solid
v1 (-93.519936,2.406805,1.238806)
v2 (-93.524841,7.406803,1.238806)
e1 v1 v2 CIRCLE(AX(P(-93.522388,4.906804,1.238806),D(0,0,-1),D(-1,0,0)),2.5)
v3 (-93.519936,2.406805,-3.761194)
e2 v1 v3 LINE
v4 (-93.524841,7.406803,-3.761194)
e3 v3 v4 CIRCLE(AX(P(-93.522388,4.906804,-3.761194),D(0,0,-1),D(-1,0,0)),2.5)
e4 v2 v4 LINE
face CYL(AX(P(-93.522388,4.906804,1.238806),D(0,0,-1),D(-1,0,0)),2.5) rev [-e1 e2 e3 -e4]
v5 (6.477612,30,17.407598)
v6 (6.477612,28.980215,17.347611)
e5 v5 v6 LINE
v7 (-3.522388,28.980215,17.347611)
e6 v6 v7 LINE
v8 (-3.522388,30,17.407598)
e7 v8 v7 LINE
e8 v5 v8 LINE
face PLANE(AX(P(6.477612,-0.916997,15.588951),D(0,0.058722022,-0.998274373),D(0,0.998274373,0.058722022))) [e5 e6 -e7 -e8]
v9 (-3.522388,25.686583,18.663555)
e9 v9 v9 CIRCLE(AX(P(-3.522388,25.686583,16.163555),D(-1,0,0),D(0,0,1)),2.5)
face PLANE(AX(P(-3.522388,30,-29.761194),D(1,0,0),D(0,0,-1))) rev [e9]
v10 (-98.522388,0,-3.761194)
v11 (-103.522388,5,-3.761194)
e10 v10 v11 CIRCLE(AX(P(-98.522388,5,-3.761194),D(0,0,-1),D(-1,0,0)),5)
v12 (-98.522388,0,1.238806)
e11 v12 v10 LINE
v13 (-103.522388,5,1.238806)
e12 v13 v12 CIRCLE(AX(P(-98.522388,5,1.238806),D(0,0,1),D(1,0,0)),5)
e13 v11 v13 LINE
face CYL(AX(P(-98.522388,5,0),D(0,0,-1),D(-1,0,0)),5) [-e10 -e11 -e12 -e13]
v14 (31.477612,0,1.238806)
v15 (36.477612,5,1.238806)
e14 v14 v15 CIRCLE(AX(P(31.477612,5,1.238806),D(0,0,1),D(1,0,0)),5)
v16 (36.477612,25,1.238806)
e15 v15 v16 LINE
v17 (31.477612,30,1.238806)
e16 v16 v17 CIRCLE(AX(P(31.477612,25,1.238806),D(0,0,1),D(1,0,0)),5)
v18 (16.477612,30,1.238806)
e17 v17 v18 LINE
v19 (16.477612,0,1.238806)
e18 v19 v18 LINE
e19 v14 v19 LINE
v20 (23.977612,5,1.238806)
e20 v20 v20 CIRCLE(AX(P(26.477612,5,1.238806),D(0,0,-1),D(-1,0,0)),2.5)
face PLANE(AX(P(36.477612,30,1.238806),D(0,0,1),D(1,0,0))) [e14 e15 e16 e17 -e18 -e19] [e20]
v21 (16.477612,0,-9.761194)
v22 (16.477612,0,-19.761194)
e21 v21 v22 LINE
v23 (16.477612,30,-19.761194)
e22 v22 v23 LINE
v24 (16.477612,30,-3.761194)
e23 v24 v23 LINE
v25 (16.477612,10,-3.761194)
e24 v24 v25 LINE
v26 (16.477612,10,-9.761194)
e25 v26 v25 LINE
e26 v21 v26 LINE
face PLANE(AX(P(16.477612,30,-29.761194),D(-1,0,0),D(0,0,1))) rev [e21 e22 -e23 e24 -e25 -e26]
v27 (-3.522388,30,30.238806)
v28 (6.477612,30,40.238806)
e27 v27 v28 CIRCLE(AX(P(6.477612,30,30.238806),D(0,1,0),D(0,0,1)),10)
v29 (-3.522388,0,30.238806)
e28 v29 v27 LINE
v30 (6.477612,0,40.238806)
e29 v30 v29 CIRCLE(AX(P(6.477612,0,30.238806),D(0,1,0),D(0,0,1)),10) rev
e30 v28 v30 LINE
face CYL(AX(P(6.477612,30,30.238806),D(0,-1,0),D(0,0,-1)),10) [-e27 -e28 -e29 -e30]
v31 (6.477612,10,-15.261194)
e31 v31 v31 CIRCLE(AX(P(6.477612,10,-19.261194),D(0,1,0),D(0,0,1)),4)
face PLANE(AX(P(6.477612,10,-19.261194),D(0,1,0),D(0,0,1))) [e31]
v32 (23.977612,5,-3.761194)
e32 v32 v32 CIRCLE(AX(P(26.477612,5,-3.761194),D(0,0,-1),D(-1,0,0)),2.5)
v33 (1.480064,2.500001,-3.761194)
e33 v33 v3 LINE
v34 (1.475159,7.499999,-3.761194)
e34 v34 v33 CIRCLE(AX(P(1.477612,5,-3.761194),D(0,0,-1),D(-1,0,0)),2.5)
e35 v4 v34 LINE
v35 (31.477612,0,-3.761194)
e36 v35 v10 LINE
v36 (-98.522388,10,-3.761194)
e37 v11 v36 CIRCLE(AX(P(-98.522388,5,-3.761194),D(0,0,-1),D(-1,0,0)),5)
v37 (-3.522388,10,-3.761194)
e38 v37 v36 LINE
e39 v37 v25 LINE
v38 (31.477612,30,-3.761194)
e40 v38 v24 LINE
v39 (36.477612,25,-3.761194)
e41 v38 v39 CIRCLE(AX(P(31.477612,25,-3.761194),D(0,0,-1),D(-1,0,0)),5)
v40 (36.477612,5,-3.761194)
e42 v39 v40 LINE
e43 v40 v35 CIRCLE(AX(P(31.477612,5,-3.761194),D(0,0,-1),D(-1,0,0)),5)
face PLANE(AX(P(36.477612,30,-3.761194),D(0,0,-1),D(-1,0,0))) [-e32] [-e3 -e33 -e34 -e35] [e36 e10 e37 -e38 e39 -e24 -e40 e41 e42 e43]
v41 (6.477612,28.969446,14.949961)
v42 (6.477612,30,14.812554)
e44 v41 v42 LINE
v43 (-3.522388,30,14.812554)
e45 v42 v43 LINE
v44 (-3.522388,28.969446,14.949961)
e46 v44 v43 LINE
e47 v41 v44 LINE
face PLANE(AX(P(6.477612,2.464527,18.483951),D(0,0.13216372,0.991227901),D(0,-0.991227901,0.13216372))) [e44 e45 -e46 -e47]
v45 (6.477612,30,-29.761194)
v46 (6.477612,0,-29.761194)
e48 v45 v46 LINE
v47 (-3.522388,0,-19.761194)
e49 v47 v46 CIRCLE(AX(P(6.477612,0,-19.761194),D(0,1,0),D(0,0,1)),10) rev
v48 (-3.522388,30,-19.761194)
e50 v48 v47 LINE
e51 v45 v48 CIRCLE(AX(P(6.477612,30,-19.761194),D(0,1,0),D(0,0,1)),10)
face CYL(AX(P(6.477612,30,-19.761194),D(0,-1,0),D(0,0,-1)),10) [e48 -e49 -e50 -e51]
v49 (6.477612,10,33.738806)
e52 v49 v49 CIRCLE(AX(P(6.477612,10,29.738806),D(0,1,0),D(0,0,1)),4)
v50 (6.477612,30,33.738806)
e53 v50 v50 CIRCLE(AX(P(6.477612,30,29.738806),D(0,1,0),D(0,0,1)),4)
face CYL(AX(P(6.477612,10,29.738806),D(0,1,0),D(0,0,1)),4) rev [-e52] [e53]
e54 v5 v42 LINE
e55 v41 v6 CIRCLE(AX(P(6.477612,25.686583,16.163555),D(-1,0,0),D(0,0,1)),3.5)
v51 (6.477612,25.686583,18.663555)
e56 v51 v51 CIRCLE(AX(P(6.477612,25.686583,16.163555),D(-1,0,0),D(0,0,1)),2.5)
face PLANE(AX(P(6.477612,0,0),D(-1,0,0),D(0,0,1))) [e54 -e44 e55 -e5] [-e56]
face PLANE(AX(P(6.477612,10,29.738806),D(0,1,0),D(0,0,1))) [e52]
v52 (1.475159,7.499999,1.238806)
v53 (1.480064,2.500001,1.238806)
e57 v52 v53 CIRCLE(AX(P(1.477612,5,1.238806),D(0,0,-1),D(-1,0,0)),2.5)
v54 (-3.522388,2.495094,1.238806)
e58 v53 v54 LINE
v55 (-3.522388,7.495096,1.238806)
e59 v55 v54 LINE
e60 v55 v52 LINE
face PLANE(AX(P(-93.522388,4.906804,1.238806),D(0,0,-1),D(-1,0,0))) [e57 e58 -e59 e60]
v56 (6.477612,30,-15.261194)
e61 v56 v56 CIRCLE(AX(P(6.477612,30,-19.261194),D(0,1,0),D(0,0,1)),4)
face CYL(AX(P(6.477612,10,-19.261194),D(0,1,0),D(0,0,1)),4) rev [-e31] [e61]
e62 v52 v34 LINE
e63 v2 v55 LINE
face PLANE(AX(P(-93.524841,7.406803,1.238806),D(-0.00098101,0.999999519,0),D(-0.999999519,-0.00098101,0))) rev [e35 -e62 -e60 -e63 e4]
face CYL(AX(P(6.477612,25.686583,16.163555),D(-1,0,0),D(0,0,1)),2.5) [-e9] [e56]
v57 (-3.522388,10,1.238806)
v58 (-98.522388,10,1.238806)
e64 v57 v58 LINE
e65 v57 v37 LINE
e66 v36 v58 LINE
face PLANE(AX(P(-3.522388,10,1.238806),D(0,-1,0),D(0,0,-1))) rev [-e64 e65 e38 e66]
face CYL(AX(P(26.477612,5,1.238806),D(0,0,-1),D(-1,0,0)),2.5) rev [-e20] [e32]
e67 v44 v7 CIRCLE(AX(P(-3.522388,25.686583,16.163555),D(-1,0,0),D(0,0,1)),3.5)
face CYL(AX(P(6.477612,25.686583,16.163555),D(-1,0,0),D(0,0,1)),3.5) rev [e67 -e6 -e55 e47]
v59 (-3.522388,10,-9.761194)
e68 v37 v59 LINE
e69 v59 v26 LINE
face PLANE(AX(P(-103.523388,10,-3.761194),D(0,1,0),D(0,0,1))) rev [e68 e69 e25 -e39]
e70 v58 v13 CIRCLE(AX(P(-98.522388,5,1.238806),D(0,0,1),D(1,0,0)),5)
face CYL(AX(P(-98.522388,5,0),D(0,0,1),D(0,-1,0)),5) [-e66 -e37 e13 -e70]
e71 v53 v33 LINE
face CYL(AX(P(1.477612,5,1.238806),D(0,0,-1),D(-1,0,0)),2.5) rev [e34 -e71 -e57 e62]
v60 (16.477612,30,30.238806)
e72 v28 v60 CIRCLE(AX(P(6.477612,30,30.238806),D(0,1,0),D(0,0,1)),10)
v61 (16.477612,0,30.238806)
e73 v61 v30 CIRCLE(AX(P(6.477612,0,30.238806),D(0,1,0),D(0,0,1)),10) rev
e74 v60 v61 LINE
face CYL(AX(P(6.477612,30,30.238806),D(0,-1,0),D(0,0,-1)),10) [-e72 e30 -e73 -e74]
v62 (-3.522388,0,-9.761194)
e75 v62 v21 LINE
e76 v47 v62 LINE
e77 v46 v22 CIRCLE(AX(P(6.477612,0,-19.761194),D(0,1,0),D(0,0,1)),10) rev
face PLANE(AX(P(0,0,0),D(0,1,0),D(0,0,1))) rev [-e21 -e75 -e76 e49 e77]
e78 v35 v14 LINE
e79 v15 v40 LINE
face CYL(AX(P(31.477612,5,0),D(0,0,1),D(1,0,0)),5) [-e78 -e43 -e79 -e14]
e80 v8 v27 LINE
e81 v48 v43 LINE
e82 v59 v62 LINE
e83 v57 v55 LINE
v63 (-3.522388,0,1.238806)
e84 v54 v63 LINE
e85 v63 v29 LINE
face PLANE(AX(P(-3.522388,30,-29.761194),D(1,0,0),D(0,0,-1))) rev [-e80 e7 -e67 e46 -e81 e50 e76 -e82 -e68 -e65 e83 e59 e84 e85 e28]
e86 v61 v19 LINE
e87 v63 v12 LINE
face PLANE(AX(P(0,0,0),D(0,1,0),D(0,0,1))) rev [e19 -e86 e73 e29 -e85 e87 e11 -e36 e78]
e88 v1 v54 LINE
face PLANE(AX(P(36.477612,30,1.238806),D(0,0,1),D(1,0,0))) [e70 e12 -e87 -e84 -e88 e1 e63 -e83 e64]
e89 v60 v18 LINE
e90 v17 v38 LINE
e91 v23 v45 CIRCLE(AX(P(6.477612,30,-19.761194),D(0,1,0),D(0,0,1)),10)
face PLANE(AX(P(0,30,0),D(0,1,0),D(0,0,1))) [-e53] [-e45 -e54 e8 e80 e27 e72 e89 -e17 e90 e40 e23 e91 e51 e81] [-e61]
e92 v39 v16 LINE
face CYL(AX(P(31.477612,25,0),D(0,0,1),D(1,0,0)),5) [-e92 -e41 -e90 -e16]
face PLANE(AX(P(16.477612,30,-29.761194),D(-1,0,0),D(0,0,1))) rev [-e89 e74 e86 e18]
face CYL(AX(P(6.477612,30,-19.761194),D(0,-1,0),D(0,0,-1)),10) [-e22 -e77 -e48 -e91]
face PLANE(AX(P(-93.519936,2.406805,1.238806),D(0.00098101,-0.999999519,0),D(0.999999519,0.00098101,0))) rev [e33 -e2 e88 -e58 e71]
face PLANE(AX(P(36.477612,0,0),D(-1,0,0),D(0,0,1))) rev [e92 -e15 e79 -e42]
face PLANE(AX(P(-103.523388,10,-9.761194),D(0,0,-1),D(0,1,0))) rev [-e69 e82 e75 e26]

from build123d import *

# Parameters (mm, degrees)
SKETCH2_W                = 20
SKETCH2_H                = 70
BOSS_EXTRUDE1_DEPTH      = 30
SKETCH3_R                = 4
CUT_EXTRUDE1_DEPTH       = 20
SKETCH4_R                = 2.5
CUT_EXTRUDE2_DEPTH       = 10
FILLET1_R                = 10
BOSS_EXTRUDE2_DEPTH      = 100
BOSS_EXTRUDE2_DEPTH_BACK = 40
SKETCH5_W                = 5
SKETCH5_H                = 30
SKETCH6_R                = 2.5
SKETCH6_W                = 100
SKETCH6_H                = 20
CUT_EXTRUDE3_DEPTH       = 5
FILLET2_R                = 5
CUT_EXTRUDE5_REACH       = 132.074
SKETCH8_W                = 6
SKETCH8_H                = 10


with BuildPart() as part:
    # Sketch2 → Boss-Extrude1 (new body)
    with BuildSketch(Plane(origin=(0, 0, 0), x_dir=(1, 0, 0), z_dir=(0, 1, 0))):
        with Locations((6.47761194, -5.23880597)):
            Rectangle(SKETCH2_W, SKETCH2_H)
    extrude(amount=BOSS_EXTRUDE1_DEPTH)

    # Sketch3 → Cut-Extrude1 (cut)
    with BuildSketch(Plane(origin=(0, 30, 0), x_dir=(1, 0, 0), z_dir=(0, 1, 0))):
        with Locations(Location((6.47761194, 19.26119403, 0), (0, 0, 270))):
            Circle(SKETCH3_R)
        with Locations(Location((6.47761194, -29.73880597, 0), (0, 0, 270))):
            Circle(SKETCH3_R)
    extrude(amount=-CUT_EXTRUDE1_DEPTH, mode=Mode.SUBTRACT)

    # Sketch4 → Cut-Extrude2 (cut)
    with BuildSketch(Plane.ZY.offset(3.52238806)):
        with BuildLine():
            Line((17.415034126, 30.126407987), (14.795699792, 30.126407987))
            Line((14.795699792, 30.126407987), (14.949961333, 28.969446425))
            ThreePointArc((14.949961333, 28.969446425), (16.17927412, 22.186618473), (17.347611009, 28.980215007))
            Line((17.347611009, 28.980215007), (17.415034126, 30.126407987))
        make_face()
        with Locations((16.163554702, 25.686583173)):
            Circle(SKETCH4_R, mode=Mode.SUBTRACT)
    extrude(amount=-CUT_EXTRUDE2_DEPTH, mode=Mode.SUBTRACT)

    # Fillet1
    fillet1_edges = [part.edges().sort_by_distance(p)[0] for p in [
        (-3.52238806, 15, -29.76119403),
        (16.47761194, 15, -29.76119403),
        (16.47761194, 15, 40.23880597),
        (-3.52238806, 15, 40.23880597),
    ]]
    fillet(fillet1_edges, radius=FILLET1_R - 0.0001)  # a hair under: the kernel refuses the full size

    # Sketch5 → Boss-Extrude2 (add, two sides: drawn at the far end of the back side and taken through both)
    with BuildSketch(Plane.ZY.offset(3.52238806).offset(-BOSS_EXTRUDE2_DEPTH_BACK)):
        with Locations((-1.26119403, 15)):
            Rectangle(SKETCH5_W, SKETCH5_H)
    extrude(amount=BOSS_EXTRUDE2_DEPTH + BOSS_EXTRUDE2_DEPTH_BACK)

    # Sketch6 → Cut-Extrude3 (cut)
    with BuildSketch(Plane(origin=(0, 0, -3.76119403), x_dir=(-1, 0, 0), z_dir=(0, 0, -1))):
        with Locations((-26.47761194, 5)):
            Circle(SKETCH6_R)
        with Locations((53.52238806, 20)):
            Rectangle(SKETCH6_W, SKETCH6_H)
        with BuildLine():
            Line((93.519935535, 2.406805213), (-1.480064465, 2.500001203))
            ThreePointArc((-1.480064465, 2.500001203), (-3.977610737, 5.002452525), (-1.475159415, 7.499998797))
            Line((-1.475159415, 7.499998797), (93.524840585, 7.406802807))
            ThreePointArc((93.524840585, 7.406802807), (96.022386857, 4.904351485), (93.519935535, 2.406805213))
        make_face()
    extrude(amount=-CUT_EXTRUDE3_DEPTH, mode=Mode.SUBTRACT)

    # Fillet2
    fillet2_edges = [part.edges().sort_by_distance(p)[0] for p in [
        (36.47761194, 30, -1.26119403),
        (36.47761194, 0, -1.26119403),
        (-103.52238806, 10, -1.26119403),
        (-103.52238806, 0, -1.26119403),
    ]]
    fillet(fillet2_edges, radius=FILLET2_R - 0.0001)  # a hair under: the kernel refuses the full size

    # Sketch8 → Cut-Extrude5 (cut, up to next)
    with BuildSketch(Plane(origin=(16.47761194, 0, 0), x_dir=(0, 0, -1), z_dir=(1, 0, 0)), mode=Mode.PRIVATE) as cut_extrude5_sk1:
        with Locations((6.76119403, 5)):
            Rectangle(SKETCH8_W, SKETCH8_H)
    cut_extrude5_tool1 = extrude(cut_extrude5_sk1.sketch, amount=-CUT_EXTRUDE5_REACH, mode=Mode.PRIVATE) & part.part
    add(cut_extrude5_tool1.solids().sort_by_distance((16.477612, 5, -6.761194))[0], mode=Mode.SUBTRACT)


solid = part.part
